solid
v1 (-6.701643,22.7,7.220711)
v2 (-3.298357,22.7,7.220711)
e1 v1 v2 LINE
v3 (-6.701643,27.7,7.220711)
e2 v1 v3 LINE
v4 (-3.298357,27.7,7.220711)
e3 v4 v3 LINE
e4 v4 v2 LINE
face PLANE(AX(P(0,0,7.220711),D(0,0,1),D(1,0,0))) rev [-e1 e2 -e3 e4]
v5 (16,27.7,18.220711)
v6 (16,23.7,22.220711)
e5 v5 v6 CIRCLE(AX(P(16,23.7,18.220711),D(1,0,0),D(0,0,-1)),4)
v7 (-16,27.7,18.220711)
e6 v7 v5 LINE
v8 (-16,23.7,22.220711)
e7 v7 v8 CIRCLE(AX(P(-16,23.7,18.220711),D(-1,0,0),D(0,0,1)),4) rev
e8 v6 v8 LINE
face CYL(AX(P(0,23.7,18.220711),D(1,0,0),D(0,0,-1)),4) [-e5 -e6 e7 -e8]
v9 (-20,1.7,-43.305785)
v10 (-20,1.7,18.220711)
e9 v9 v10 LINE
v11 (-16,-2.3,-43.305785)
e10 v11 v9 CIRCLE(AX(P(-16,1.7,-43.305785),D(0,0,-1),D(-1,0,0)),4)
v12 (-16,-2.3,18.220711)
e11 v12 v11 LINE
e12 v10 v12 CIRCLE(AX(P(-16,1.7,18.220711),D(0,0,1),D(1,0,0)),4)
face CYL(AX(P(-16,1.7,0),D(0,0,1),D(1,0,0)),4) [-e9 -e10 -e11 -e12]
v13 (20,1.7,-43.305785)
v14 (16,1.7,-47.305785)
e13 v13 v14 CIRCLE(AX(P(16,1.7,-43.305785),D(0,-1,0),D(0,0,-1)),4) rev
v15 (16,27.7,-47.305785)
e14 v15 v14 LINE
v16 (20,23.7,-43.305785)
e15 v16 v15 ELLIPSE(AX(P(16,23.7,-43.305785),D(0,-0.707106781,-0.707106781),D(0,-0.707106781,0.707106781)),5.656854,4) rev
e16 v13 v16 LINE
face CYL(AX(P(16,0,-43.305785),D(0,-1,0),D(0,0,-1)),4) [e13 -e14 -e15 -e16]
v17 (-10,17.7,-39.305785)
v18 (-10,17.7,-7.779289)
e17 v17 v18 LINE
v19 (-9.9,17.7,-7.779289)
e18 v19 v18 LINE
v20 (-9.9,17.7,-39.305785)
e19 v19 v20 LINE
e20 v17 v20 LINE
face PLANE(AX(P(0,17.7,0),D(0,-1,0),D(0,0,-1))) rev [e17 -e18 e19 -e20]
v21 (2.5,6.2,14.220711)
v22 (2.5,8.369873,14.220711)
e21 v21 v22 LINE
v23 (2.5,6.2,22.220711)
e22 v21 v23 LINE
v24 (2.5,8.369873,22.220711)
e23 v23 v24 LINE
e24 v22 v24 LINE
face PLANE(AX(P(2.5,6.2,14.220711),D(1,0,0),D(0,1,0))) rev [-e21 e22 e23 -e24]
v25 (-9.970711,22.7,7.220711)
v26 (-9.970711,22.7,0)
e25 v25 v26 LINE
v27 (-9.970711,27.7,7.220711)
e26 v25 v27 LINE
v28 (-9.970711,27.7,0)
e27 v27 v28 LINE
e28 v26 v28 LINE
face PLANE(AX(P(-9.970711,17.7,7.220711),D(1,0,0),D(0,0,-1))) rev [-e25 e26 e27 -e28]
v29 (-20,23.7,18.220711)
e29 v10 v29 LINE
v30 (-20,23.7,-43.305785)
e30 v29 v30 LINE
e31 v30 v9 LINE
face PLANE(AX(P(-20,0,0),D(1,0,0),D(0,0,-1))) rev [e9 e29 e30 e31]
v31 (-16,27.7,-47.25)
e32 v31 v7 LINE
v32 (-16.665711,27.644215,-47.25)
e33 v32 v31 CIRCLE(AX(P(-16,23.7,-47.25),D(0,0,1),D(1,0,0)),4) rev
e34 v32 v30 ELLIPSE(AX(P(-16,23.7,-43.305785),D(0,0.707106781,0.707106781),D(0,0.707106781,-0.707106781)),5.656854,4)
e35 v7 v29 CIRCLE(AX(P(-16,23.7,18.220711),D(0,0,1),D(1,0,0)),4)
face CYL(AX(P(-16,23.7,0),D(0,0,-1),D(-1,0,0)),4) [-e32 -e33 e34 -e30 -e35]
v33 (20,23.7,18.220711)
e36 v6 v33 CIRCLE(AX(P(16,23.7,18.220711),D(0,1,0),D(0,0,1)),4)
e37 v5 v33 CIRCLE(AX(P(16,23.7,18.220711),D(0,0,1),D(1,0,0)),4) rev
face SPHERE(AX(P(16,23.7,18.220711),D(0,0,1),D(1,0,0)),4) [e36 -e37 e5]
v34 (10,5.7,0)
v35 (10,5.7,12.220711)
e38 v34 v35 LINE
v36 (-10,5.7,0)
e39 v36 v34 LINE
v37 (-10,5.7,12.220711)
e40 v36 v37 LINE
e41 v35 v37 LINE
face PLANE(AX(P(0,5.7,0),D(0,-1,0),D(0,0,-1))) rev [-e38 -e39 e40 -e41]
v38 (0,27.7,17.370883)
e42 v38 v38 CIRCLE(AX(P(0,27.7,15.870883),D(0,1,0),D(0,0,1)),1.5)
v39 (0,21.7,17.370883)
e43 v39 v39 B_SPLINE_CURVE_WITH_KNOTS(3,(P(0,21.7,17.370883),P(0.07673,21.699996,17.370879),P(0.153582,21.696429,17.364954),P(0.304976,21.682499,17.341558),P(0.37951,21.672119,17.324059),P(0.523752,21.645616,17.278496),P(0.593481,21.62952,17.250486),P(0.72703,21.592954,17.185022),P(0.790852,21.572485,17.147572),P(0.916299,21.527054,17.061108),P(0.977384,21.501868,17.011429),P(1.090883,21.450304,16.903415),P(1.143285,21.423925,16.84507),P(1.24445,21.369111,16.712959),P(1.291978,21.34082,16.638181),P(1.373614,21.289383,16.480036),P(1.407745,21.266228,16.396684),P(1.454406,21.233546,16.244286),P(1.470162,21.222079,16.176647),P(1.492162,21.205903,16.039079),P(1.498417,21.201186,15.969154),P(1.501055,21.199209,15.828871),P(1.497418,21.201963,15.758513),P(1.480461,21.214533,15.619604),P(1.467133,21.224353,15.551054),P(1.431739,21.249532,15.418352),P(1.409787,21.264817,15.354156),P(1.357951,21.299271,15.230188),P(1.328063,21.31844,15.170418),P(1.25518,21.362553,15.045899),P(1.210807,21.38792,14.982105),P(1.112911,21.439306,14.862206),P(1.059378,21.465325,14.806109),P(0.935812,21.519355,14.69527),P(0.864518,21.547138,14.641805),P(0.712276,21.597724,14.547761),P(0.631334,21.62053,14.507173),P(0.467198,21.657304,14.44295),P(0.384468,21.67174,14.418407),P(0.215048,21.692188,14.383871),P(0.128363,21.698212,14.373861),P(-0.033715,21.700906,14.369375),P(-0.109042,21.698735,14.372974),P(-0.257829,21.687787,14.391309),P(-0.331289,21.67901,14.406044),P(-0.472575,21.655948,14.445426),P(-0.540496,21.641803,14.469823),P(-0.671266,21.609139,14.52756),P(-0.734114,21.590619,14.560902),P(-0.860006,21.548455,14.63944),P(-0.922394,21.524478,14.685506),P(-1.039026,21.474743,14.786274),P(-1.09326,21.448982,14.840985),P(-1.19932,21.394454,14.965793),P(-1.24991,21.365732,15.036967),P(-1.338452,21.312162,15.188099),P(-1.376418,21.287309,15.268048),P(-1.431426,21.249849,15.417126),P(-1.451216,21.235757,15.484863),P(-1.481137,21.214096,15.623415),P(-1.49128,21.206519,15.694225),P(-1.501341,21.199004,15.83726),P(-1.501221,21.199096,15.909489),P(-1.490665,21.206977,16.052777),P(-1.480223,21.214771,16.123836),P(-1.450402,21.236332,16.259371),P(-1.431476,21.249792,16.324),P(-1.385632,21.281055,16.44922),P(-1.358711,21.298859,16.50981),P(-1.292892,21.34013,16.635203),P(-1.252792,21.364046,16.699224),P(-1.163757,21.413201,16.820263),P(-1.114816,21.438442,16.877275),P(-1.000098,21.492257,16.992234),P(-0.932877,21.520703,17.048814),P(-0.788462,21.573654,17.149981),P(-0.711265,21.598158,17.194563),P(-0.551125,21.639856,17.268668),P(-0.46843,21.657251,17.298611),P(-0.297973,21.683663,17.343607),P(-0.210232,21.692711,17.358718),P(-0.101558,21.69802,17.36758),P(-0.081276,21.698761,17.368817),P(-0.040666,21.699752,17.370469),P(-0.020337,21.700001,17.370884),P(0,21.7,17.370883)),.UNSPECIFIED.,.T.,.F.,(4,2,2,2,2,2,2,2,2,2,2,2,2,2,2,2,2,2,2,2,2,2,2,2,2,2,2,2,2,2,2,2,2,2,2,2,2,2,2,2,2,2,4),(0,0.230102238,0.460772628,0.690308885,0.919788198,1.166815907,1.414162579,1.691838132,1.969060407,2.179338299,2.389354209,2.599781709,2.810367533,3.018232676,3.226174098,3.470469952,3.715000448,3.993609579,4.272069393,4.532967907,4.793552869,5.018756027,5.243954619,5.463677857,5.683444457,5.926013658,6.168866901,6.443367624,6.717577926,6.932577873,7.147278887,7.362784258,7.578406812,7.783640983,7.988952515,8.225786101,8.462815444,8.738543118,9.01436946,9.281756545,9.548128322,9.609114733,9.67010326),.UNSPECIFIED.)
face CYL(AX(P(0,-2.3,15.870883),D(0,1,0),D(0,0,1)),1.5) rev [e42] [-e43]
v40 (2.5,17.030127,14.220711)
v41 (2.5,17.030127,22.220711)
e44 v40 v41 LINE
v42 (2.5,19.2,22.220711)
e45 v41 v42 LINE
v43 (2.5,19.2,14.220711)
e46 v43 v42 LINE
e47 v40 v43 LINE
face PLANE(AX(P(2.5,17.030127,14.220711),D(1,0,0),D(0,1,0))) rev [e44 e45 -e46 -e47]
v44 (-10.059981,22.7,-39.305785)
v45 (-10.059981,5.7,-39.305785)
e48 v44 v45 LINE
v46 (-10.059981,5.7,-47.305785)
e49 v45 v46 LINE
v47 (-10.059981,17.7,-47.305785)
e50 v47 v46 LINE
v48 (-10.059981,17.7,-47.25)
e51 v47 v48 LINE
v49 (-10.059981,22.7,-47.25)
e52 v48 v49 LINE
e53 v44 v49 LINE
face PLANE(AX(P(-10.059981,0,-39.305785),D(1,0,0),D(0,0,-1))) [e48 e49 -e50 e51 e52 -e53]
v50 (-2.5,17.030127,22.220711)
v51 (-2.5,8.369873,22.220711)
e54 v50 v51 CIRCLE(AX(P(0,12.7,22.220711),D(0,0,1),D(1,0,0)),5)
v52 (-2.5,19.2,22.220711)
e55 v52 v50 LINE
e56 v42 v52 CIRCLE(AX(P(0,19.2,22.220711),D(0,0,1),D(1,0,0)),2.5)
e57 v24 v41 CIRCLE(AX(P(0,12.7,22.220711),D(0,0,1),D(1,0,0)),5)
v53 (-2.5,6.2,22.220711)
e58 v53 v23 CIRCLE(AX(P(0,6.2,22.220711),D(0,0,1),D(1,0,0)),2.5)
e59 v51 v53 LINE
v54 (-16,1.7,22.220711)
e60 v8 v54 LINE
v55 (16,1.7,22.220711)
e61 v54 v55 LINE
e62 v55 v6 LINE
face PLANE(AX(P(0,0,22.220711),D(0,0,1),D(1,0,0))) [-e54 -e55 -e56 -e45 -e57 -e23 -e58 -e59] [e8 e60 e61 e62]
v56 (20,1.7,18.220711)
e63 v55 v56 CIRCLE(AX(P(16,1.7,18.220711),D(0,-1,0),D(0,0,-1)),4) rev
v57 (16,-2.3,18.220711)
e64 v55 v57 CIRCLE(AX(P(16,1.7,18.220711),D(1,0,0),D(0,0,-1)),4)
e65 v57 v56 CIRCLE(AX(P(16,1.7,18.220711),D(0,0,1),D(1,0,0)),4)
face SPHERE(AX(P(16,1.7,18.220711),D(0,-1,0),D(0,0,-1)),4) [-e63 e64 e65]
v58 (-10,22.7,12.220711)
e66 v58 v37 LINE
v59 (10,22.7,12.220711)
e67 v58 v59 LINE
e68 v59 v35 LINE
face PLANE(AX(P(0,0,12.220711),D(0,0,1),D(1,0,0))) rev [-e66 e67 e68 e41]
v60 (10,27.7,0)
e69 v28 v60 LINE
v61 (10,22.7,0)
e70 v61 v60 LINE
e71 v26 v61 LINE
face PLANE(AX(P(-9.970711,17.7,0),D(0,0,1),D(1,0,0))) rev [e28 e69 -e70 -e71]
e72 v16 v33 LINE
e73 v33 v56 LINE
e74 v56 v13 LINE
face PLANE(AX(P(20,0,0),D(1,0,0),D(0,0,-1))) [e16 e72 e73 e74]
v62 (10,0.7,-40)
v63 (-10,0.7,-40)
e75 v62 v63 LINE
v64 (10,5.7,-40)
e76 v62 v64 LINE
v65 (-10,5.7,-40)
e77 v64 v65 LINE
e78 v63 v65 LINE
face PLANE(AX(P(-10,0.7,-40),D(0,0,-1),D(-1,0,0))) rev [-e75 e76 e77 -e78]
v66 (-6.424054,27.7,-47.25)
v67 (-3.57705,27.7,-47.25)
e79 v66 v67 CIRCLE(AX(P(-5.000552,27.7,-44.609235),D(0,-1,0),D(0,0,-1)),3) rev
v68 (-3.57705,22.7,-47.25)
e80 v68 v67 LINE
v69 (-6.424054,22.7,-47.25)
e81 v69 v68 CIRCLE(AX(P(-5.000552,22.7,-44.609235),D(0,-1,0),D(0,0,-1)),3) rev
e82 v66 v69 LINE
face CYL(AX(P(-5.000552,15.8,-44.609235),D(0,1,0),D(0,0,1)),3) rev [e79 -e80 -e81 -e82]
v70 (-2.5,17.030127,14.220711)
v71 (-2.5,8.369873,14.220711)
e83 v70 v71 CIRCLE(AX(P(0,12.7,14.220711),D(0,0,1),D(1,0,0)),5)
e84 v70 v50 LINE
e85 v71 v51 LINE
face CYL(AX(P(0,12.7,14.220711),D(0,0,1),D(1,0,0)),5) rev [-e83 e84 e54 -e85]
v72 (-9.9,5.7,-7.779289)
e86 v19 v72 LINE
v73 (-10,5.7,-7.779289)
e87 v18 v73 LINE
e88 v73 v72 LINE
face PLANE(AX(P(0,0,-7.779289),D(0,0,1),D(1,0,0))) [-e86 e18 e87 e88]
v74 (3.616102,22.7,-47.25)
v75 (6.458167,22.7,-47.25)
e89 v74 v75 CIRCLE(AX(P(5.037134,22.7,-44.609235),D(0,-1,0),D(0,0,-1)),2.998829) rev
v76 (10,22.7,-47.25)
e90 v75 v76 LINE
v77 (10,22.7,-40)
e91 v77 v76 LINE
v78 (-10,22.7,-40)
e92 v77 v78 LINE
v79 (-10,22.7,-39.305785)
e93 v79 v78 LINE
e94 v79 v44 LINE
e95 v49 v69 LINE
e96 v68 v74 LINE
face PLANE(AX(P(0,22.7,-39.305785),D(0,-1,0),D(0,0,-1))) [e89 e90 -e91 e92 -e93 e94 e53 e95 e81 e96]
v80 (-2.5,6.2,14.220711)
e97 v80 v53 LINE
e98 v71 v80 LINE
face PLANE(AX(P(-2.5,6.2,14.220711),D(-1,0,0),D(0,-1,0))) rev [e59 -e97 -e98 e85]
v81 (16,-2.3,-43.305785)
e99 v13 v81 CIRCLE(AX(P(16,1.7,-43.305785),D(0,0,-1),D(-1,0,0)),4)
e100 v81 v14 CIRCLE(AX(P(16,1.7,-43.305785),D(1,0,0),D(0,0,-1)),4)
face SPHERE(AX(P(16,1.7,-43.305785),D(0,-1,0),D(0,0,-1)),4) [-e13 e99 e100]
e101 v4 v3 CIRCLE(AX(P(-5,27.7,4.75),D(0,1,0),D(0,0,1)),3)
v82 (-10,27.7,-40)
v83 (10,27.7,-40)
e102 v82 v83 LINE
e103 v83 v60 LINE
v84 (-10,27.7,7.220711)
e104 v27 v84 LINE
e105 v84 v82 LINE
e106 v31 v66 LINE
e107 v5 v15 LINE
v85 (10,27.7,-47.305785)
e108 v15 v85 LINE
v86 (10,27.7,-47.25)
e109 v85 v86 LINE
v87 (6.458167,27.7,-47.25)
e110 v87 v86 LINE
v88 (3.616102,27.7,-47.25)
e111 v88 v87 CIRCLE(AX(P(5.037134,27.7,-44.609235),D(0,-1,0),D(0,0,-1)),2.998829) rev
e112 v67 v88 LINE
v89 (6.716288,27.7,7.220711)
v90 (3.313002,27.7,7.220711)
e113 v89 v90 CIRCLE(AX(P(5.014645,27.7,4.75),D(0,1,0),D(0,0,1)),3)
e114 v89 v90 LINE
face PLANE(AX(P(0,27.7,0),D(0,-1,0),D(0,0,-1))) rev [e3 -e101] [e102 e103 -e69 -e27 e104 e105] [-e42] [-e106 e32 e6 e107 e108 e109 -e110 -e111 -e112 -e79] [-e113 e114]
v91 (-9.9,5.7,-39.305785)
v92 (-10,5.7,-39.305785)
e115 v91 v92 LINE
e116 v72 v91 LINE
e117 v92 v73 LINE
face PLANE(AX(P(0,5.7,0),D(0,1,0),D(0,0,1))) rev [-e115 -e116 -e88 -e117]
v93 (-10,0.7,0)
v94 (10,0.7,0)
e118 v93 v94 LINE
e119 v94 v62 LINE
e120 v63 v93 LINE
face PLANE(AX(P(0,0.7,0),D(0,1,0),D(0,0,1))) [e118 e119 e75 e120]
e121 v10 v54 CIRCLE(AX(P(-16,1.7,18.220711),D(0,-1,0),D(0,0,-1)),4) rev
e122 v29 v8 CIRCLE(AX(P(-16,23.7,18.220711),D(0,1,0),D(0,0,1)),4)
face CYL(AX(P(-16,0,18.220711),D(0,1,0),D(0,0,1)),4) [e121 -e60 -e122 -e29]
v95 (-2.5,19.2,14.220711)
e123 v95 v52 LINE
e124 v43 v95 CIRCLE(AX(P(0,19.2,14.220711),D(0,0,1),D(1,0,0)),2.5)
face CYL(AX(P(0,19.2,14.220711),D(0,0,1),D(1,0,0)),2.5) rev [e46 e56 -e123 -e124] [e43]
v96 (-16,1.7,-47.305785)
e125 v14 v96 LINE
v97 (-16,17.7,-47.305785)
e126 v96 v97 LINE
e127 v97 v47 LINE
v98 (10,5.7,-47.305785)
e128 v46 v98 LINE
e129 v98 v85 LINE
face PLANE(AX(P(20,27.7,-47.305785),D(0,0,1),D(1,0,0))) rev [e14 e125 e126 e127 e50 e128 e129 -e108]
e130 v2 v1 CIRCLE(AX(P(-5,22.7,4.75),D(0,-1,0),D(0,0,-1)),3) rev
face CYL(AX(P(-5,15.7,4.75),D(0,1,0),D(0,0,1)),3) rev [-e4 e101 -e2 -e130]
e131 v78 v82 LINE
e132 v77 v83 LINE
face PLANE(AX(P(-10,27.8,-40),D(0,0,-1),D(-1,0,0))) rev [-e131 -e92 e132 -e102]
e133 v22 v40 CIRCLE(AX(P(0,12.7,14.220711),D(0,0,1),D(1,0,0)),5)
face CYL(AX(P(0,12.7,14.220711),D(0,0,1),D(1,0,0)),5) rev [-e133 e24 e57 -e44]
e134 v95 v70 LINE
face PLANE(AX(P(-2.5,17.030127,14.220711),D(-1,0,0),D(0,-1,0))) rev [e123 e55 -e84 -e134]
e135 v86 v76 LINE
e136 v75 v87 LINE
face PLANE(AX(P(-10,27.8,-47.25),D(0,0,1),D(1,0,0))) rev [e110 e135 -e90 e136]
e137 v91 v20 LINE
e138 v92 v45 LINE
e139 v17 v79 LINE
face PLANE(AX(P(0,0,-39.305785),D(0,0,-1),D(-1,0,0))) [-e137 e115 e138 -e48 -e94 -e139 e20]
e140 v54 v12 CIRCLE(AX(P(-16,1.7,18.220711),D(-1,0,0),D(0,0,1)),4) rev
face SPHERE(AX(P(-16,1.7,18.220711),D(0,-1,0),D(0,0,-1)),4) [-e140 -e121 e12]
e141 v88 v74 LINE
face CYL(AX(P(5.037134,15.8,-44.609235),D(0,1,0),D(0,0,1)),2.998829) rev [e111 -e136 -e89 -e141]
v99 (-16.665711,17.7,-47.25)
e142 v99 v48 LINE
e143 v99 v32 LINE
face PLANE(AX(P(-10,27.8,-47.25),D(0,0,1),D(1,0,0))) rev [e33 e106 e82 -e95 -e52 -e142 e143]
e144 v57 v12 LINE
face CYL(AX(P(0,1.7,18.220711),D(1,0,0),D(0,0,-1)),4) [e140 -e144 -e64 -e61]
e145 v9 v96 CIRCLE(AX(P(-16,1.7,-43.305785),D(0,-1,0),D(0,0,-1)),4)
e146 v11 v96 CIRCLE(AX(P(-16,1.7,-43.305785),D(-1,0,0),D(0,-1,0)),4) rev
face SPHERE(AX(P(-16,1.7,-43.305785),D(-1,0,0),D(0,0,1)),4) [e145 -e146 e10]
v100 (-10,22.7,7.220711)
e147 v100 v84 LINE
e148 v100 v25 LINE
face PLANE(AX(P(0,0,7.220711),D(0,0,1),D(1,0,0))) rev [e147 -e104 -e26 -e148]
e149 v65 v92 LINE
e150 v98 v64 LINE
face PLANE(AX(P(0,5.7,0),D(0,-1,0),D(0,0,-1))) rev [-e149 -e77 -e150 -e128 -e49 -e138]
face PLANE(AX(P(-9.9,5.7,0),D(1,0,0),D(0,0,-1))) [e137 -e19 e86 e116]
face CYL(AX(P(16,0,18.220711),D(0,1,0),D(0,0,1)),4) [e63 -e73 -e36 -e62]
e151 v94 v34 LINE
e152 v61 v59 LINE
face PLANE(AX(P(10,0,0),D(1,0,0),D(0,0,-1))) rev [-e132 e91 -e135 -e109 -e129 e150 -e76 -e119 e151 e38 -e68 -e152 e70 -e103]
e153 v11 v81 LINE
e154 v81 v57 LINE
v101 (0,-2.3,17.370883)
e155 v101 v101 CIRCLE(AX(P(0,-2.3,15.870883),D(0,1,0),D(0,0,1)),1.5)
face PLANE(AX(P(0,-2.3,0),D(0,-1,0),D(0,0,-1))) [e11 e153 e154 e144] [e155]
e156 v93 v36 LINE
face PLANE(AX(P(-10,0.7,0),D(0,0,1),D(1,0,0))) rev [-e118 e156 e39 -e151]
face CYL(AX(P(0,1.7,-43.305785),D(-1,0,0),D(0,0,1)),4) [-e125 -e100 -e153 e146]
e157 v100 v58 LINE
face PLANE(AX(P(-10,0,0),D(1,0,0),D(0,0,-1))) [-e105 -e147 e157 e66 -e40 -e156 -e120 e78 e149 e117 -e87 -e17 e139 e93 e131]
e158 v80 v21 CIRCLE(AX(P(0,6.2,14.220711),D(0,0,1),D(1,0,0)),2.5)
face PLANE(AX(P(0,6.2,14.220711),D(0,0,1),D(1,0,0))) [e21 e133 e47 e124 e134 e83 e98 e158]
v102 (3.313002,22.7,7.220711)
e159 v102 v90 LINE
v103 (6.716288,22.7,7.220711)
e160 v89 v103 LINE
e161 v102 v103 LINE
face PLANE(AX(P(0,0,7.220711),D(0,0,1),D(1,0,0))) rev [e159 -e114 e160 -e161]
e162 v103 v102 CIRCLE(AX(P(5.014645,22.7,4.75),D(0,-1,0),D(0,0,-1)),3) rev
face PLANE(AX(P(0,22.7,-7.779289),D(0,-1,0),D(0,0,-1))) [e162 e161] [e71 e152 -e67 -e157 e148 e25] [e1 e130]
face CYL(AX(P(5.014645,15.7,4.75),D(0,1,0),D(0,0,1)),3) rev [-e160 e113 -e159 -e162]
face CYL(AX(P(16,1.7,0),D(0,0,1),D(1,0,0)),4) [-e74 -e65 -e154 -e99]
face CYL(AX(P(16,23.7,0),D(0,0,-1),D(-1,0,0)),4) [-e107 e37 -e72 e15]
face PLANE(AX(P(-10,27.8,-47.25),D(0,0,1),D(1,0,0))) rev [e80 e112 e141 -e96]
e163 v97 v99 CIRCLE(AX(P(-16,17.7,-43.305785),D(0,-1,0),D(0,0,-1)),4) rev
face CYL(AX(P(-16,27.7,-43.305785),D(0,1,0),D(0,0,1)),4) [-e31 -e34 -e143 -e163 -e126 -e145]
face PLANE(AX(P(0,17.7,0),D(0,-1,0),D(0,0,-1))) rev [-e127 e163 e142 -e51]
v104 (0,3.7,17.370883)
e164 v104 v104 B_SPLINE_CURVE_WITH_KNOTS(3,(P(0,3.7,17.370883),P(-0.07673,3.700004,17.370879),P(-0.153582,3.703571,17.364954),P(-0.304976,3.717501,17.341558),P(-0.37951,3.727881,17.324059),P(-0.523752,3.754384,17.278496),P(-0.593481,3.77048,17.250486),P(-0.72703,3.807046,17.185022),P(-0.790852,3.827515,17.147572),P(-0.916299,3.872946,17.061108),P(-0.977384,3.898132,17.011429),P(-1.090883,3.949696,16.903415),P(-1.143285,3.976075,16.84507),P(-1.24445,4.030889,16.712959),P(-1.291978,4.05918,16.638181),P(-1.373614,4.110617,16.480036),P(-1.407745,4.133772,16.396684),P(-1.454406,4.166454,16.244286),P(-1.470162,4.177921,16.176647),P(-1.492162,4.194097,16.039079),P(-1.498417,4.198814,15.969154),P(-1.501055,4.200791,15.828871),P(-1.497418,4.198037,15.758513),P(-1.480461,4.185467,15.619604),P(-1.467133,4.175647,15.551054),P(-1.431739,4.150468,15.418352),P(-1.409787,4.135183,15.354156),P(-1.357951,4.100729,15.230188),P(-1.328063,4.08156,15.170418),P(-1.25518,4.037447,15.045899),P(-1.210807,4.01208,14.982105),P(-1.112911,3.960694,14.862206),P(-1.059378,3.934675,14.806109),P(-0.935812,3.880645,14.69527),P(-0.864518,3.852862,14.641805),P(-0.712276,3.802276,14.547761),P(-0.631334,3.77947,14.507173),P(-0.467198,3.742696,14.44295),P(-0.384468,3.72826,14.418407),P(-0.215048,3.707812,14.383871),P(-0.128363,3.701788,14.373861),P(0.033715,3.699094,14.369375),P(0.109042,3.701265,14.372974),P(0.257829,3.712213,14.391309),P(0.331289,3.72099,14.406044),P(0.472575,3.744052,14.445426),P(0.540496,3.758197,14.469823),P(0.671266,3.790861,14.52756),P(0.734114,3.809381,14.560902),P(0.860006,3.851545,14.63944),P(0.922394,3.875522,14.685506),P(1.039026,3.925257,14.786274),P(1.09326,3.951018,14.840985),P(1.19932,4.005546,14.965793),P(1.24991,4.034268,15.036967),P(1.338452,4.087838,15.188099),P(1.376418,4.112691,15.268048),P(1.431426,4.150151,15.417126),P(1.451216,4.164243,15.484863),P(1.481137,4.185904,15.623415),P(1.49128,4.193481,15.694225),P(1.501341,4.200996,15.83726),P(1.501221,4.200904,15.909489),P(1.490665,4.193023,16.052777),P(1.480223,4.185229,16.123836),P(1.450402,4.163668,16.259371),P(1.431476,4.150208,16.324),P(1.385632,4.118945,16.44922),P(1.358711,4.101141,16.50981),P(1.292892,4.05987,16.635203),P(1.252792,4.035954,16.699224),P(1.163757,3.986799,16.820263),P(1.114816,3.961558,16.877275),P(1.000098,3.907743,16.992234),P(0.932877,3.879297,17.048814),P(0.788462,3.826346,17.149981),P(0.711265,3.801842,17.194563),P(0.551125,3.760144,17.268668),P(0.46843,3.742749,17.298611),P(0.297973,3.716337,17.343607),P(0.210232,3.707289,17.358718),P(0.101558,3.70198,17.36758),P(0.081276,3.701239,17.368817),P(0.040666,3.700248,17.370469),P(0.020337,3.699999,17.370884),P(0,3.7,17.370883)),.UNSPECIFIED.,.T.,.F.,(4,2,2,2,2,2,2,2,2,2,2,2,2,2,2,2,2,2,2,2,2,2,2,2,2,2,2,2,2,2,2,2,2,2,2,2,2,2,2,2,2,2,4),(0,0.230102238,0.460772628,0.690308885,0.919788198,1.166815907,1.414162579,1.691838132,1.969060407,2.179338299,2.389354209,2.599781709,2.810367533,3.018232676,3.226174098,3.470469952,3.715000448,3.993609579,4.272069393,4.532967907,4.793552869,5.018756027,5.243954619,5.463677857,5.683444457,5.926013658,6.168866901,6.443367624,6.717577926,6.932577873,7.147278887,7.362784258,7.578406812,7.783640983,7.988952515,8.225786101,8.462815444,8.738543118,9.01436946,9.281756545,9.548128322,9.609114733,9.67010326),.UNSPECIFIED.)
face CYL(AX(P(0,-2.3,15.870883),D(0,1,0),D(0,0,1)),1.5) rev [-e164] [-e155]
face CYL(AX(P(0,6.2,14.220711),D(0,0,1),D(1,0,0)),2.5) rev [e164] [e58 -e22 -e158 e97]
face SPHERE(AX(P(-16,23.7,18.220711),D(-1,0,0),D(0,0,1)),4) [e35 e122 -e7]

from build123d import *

# Parameters (mm, degrees)
SKETCH3_W            = 19.970710678
SKETCH3_H            = 7.220710678
BOSS_EXTRUDE2_DEPTH  = 10
SKETCH4_W            = 54.526496071
SKETCH4_H            = 10
BOSS_EXTRUDE3_DEPTH  = 10
SKETCH5_W            = 7.25
SKETCH5_H            = 10.1
BOSS_EXTRUDE4_DEPTH  = 20
SKETCH6_W            = 54.470710678
SKETCH6_H            = 10
BOSS_EXTRUDE5_DEPTH  = 10
SKETCH7_R            = 3
SKETCH7_R_2          = 2.998828916
CUT_EXTRUDE1_DEPTH   = 12
SKETCH8_R            = 3
CUT_EXTRUDE2_DEPTH   = 12
SKETCH9_W            = 40
SKETCH9_H            = 54.526496071
SKETCH9_W_2          = 19.9
SKETCH9_H_2          = 40
BOSS_EXTRUDE8_DEPTH  = 12
SKETCH10_W           = 20.059980773
SKETCH10_H           = 17
CUT_EXTRUDE6_DEPTH   = 8
SKETCH11_W           = 40
SKETCH11_H           = 22
BOSS_EXTRUDE9_DEPTH  = 5
SKETCH12_W           = 7.25
SKETCH12_H           = 0.1
CUT_EXTRUDE7_DEPTH   = 20
SKETCH13_W           = 20
SKETCH13_H           = 17
CUT_EXTRUDE8_DEPTH   = 20
SKETCH16_W           = 40
SKETCH16_H           = 59.526496071
BOSS_EXTRUDE11_DEPTH = 8
SKETCH17_W           = 20
SKETCH17_H           = 40
CUT_EXTRUDE10_DEPTH  = 5
SKETCH19_W           = 40
SKETCH19_H           = 30
BOSS_EXTRUDE12_DEPTH = 10
CUT_EXTRUDE11_DEPTH  = 8
SKETCH21_R           = 1.5
CUT_EXTRUDE12_DEPTH  = 30
FILLET2_R            = 4


with BuildPart() as part:
    # Sketch3 → Boss-Extrude2 (new body)
    with BuildSketch(Plane.XZ.offset(-27.7)):
        with Locations((0.014644661, 3.610355339)):
            Rectangle(SKETCH3_W, SKETCH3_H)
    extrude(amount=BOSS_EXTRUDE2_DEPTH)

    # Sketch4 → Boss-Extrude3 (add)
    with BuildSketch(Plane(origin=(10, 0, 0), x_dir=(0, 0, -1), z_dir=(1, 0, 0))):
        with Locations((20.042537357, 22.7)):
            Rectangle(SKETCH4_W, SKETCH4_H)
    extrude(amount=BOSS_EXTRUDE3_DEPTH)

    # Sketch5 → Boss-Extrude4 (add)
    with BuildSketch(Plane.ZY.offset(-10)):
        with Locations((-43.625, 22.75)):
            Rectangle(SKETCH5_W, SKETCH5_H)
    extrude(amount=BOSS_EXTRUDE4_DEPTH)

    # Sketch6 → Boss-Extrude5 (add)
    with BuildSketch(Plane.ZY.offset(10)):
        with Locations((-20.014644661, 22.7)):
            Rectangle(SKETCH6_W, SKETCH6_H)
    extrude(amount=BOSS_EXTRUDE5_DEPTH)

    # Sketch7 → Cut-Extrude1 (cut)
    with BuildSketch(Plane(origin=(0, 27.8, 0), x_dir=(1, 0, 0), z_dir=(0, 1, 0))):
        with Locations((-5.000552171, 44.609234731)):
            Circle(SKETCH7_R)
        with Locations((5.037134364, 44.609234731)):
            Circle(SKETCH7_R_2)
    extrude(amount=-CUT_EXTRUDE1_DEPTH, mode=Mode.SUBTRACT)

    # Sketch8 → Cut-Extrude2 (cut)
    with BuildSketch(Plane(origin=(0, 27.7, 0), x_dir=(1, 0, 0), z_dir=(0, 1, 0))):
        with Locations((-5, -4.75)):
            Circle(SKETCH8_R)
        with Locations((5.014644661, -4.75)):
            Circle(SKETCH8_R)
    extrude(amount=-CUT_EXTRUDE2_DEPTH, mode=Mode.SUBTRACT)

    # Sketch9 → Boss-Extrude8 (add)
    with BuildSketch(Plane.XZ.offset(-17.7)):
        with Locations((0, -20.042537357)):
            Rectangle(SKETCH9_W, SKETCH9_H)
        with Locations((0.05, -20)):
            Rectangle(SKETCH9_W_2, SKETCH9_H_2, mode=Mode.SUBTRACT)
    extrude(amount=BOSS_EXTRUDE8_DEPTH)

    # Sketch10 → Cut-Extrude6 (cut)
    with BuildSketch(Plane(origin=(0, 0, -47.305785393), x_dir=(-1, 0, 0), z_dir=(0, 0, -1))):
        with Locations((0.029990387, 14.2)):
            Rectangle(SKETCH10_W, SKETCH10_H)
    extrude(amount=-CUT_EXTRUDE6_DEPTH, mode=Mode.SUBTRACT)

    # Sketch11 → Boss-Extrude9 (add)
    with BuildSketch(Plane.XY.offset(7.220710678)):
        with Locations((0, 16.7)):
            Rectangle(SKETCH11_W, SKETCH11_H)
    extrude(amount=BOSS_EXTRUDE9_DEPTH)

    # Sketch12 → Cut-Extrude7 (cut)
    with BuildSketch(Plane(origin=(10, 0, 0), x_dir=(0, 0, -1), z_dir=(1, 0, 0))):
        with Locations((43.625, 27.75)):
            Rectangle(SKETCH12_W, SKETCH12_H)
    extrude(amount=-CUT_EXTRUDE7_DEPTH, mode=Mode.SUBTRACT)

    # Sketch13 → Cut-Extrude8 (cut)
    with BuildSketch(Plane.XY.offset(12.220710678)):
        with Locations((0, 14.2)):
            Rectangle(SKETCH13_W, SKETCH13_H)
    extrude(amount=-CUT_EXTRUDE8_DEPTH, mode=Mode.SUBTRACT)

    # Sketch16 → Boss-Extrude11 (add)
    with BuildSketch(Plane.XZ.offset(-5.7)):
        with Locations((0, -17.542537357)):
            Rectangle(SKETCH16_W, SKETCH16_H)
    extrude(amount=BOSS_EXTRUDE11_DEPTH)

    # Sketch17 → Cut-Extrude10 (cut)
    with BuildSketch(Plane(origin=(0, 5.7, 0), x_dir=(1, 0, 0), z_dir=(0, 1, 0))):
        with Locations((0, 20)):
            Rectangle(SKETCH17_W, SKETCH17_H)
    extrude(amount=-CUT_EXTRUDE10_DEPTH, mode=Mode.SUBTRACT)

    # Sketch19 → Boss-Extrude12 (add)
    with BuildSketch(Plane.XY.offset(12.220710678)):
        with Locations((0, 12.7)):
            Rectangle(SKETCH19_W, SKETCH19_H)
    extrude(amount=BOSS_EXTRUDE12_DEPTH)

    # Sketch20 → Cut-Extrude11 (cut)
    with BuildSketch(Plane.XY.offset(22.220710678)):
        with BuildLine():
            Line((-2.5, 6.2), (-2.5, 8.369872981))
            ThreePointArc((-2.5, 8.369872981), (-5, 12.7), (-2.5, 17.030127019))
            Line((-2.5, 17.030127019), (-2.5, 19.2))
            ThreePointArc((-2.5, 19.2), (0, 21.7), (2.5, 19.2))
            Line((2.5, 19.2), (2.5, 17.030127019))
            ThreePointArc((2.5, 17.030127019), (5, 12.7), (2.5, 8.369872981))
            Line((2.5, 8.369872981), (2.5, 6.2))
            ThreePointArc((2.5, 6.2), (0, 3.7), (-2.5, 6.2))
        make_face()
    extrude(amount=-CUT_EXTRUDE11_DEPTH, mode=Mode.SUBTRACT)

    # Sketch21 → Cut-Extrude12 (cut)
    with BuildSketch(Plane(origin=(0, 27.7, 0), x_dir=(1, 0, 0), z_dir=(0, 1, 0))):
        with Locations(Location((0, -15.870882648, 0), (0, 0, 270))):
            Circle(SKETCH21_R)
    extrude(amount=-CUT_EXTRUDE12_DEPTH, mode=Mode.SUBTRACT)

    # Fillet2
    # the kernel refuses this fillet: 4 mm, written as the material it takes off along each edge
    with BuildSketch(Plane(origin=(16, 23.7, 18.220710678), x_dir=(1, 0, 0), z_dir=(0, 1, 0))) as fillet2_piece_1_section:
        Polygon((0, 0), (FILLET2_R, 0), (FILLET2_R, -FILLET2_R), (0, -FILLET2_R), align=None)
    fillet2_piece_1 = extrude(amount=FILLET2_R, mode=Mode.PRIVATE)
    fillet2_piece_1 = fillet2_piece_1 - Plane(origin=(16, 23.7, 18.220710678), x_dir=(-0.7071067811865475, 0, -0.7071067811865475), z_dir=(0, 1, 0)) * Sphere(FILLET2_R, mode=Mode.PRIVATE)
    add(fillet2_piece_1, mode=Mode.SUBTRACT)
    with BuildSketch(Plane(origin=(-16, 23.7, 18.220710678), x_dir=(0, 1, 0), z_dir=(-1, 0, 0))) as fillet2_piece_2_section:
        Polygon((0, 0), (FILLET2_R, 0), (FILLET2_R, -FILLET2_R), (0, -FILLET2_R), align=None)
    fillet2_piece_2 = extrude(amount=FILLET2_R, mode=Mode.PRIVATE)
    fillet2_piece_2 = fillet2_piece_2 - Plane(origin=(-16, 23.7, 18.220710678), x_dir=(0, -0.7071067811865475, -0.7071067811865475), z_dir=(-1, 0, 0)) * Sphere(FILLET2_R, mode=Mode.PRIVATE)
    add(fillet2_piece_2, mode=Mode.SUBTRACT)
    with BuildSketch(Plane(origin=(-16, 1.7, -43.305785393), x_dir=(0, 0, -1), z_dir=(-1, 0, 0))) as fillet2_piece_3_section:
        Polygon((0, 0), (FILLET2_R, 0), (FILLET2_R, FILLET2_R), (0, FILLET2_R), align=None)
    fillet2_piece_3 = extrude(amount=FILLET2_R, mode=Mode.PRIVATE)
    fillet2_piece_3 = fillet2_piece_3 - Plane(origin=(-16, 1.7, -43.305785393), x_dir=(0, 0.7071067811865475, 0.7071067811865475), z_dir=(-1, 0, 0)) * Sphere(FILLET2_R, mode=Mode.PRIVATE)
    add(fillet2_piece_3, mode=Mode.SUBTRACT)
    with BuildSketch(Plane(origin=(-16, 1.7, 18.220710678), x_dir=(0, 0, 1), z_dir=(-1, 0, 0))) as fillet2_piece_4_section:
        Polygon((0, 0), (FILLET2_R, 0), (FILLET2_R, -FILLET2_R), (0, -FILLET2_R), align=None)
    fillet2_piece_4 = extrude(amount=FILLET2_R, mode=Mode.PRIVATE)
    fillet2_piece_4 = fillet2_piece_4 - Plane(origin=(-16, 1.7, 18.220710678), x_dir=(0, 0.7071067811865475, -0.7071067811865475), z_dir=(-1, 0, 0)) * Sphere(FILLET2_R, mode=Mode.PRIVATE)
    add(fillet2_piece_4, mode=Mode.SUBTRACT)
    with BuildSketch(Plane(origin=(16, 1.7, 18.220710678), x_dir=(1, 0, 0), z_dir=(0, -1, 0))) as fillet2_piece_5_section:
        Polygon((0, 0), (FILLET2_R, 0), (FILLET2_R, FILLET2_R), (0, FILLET2_R), align=None)
    fillet2_piece_5 = extrude(amount=FILLET2_R, mode=Mode.PRIVATE)
    fillet2_piece_5 = fillet2_piece_5 - Plane(origin=(16, 1.7, 18.220710678), x_dir=(-0.7071067811865475, 0, -0.7071067811865475), z_dir=(0, -1, 0)) * Sphere(FILLET2_R, mode=Mode.PRIVATE)
    add(fillet2_piece_5, mode=Mode.SUBTRACT)
    with BuildSketch(Plane(origin=(16, 1.7, -43.305785393), x_dir=(0, 0, -1), z_dir=(0, -1, 0))) as fillet2_piece_6_section:
        Polygon((0, 0), (FILLET2_R, 0), (FILLET2_R, FILLET2_R), (0, FILLET2_R), align=None)
    fillet2_piece_6 = extrude(amount=FILLET2_R, mode=Mode.PRIVATE)
    fillet2_piece_6 = fillet2_piece_6 - Plane(origin=(16, 1.7, -43.305785393), x_dir=(-0.7071067811865475, 0, 0.7071067811865475), z_dir=(0, -1, 0)) * Sphere(FILLET2_R, mode=Mode.PRIVATE)
    add(fillet2_piece_6, mode=Mode.SUBTRACT)
    with BuildSketch(Plane(origin=(20, 27.7, 18.220710678), x_dir=(-1, 0, 0), z_dir=(0, 0, -1))) as fillet2_piece_7:
        with BuildLine():
            CenterArc((FILLET2_R, -FILLET2_R), FILLET2_R, 90, 90)
            Line((0, -FILLET2_R), (0, 0))
            Line((0, 0), (FILLET2_R, 0))
        make_face()
    extrude(amount=75.526496071, mode=Mode.SUBTRACT)
    with BuildSketch(Plane(origin=(-20, 27.7, -57.25), x_dir=(1, 0, 0), z_dir=(0, 0, 1))) as fillet2_piece_8:
        with BuildLine():
            CenterArc((FILLET2_R, -FILLET2_R), FILLET2_R, 90, 90)
            Line((0, -FILLET2_R), (0, 0))
            Line((0, 0), (FILLET2_R, 0))
        make_face()
    extrude(amount=75.470710678, mode=Mode.SUBTRACT)
    with BuildSketch(Plane(origin=(-20, -2.3, -43.305785393), x_dir=(0, 1, 0), z_dir=(0, 0, 1)), Plane(origin=(20, -2.3, 18.220710678), x_dir=(0, 1, 0), z_dir=(0, 0, -1))) as fillet2_piece_9:
        with BuildLine():
            CenterArc((FILLET2_R, -FILLET2_R), FILLET2_R, 90, 90)
            Line((0, -FILLET2_R), (0, 0))
            Line((0, 0), (FILLET2_R, 0))
        make_face()
    extrude(amount=61.526496071, mode=Mode.SUBTRACT)
    with BuildSketch(Plane(origin=(16, -2.3, -47.305785393), x_dir=(0, 1, 0), z_dir=(-1, 0, 0)), Plane(origin=(-16, 27.7, 22.220710678), x_dir=(0, 0, -1), z_dir=(1, 0, 0))) as fillet2_piece_10:
        with BuildLine():
            CenterArc((FILLET2_R, -FILLET2_R), FILLET2_R, 90, 90)
            Line((0, -FILLET2_R), (0, 0))
            Line((0, 0), (FILLET2_R, 0))
        make_face()
    extrude(amount=32, mode=Mode.SUBTRACT)
    with BuildSketch(Plane(origin=(16, -2.3, 22.220710678), x_dir=(0, 1, 0), z_dir=(-1, 0, 0))) as fillet2_piece_11:
        with BuildLine():
            CenterArc((FILLET2_R, FILLET2_R), FILLET2_R, 180, 90)
            Line((0, FILLET2_R), (0, 0))
            Line((0, 0), (FILLET2_R, 0))
        make_face()
    extrude(amount=32, mode=Mode.SUBTRACT)
    with BuildSketch(Plane(origin=(-20, 1.7, -47.305785393), x_dir=(1, 0, 0), z_dir=(0, 1, 0))) as fillet2_piece_12:
        with BuildLine():
            CenterArc((FILLET2_R, -FILLET2_R), FILLET2_R, 90, 90)
            Line((0, -FILLET2_R), (0, 0))
            Line((0, 0), (FILLET2_R, 0))
        make_face()
    extrude(amount=26, mode=Mode.SUBTRACT)
    with BuildSketch(Plane(origin=(20, 37.7, -47.305785393), x_dir=(-1, 0, 0), z_dir=(0, -1, 0))) as fillet2_piece_13:
        with BuildLine():
            CenterArc((FILLET2_R, -FILLET2_R), FILLET2_R, 90, 90)
            Line((0, -FILLET2_R), (0, 0))
            Line((0, 0), (FILLET2_R, 0))
        make_face()
    extrude(amount=36, mode=Mode.SUBTRACT)
    with BuildSketch(Plane(origin=(20, 23.7, 22.220710678), x_dir=(0, 0, -1), z_dir=(0, -1, 0))) as fillet2_piece_14:
        with BuildLine():
            CenterArc((FILLET2_R, -FILLET2_R), FILLET2_R, 90, 90)
            Line((0, -FILLET2_R), (0, 0))
            Line((0, 0), (FILLET2_R, 0))
        make_face()
    extrude(amount=22, mode=Mode.SUBTRACT)
    with BuildSketch(Plane(origin=(-20, 1.7, 22.220710678), x_dir=(1, 0, 0), z_dir=(0, 1, 0))) as fillet2_piece_15:
        with BuildLine():
            CenterArc((FILLET2_R, FILLET2_R), FILLET2_R, 180, 90)
            Line((0, FILLET2_R), (0, 0))
            Line((0, 0), (FILLET2_R, 0))
        make_face()
    extrude(amount=22, mode=Mode.SUBTRACT)


solid = part.part
